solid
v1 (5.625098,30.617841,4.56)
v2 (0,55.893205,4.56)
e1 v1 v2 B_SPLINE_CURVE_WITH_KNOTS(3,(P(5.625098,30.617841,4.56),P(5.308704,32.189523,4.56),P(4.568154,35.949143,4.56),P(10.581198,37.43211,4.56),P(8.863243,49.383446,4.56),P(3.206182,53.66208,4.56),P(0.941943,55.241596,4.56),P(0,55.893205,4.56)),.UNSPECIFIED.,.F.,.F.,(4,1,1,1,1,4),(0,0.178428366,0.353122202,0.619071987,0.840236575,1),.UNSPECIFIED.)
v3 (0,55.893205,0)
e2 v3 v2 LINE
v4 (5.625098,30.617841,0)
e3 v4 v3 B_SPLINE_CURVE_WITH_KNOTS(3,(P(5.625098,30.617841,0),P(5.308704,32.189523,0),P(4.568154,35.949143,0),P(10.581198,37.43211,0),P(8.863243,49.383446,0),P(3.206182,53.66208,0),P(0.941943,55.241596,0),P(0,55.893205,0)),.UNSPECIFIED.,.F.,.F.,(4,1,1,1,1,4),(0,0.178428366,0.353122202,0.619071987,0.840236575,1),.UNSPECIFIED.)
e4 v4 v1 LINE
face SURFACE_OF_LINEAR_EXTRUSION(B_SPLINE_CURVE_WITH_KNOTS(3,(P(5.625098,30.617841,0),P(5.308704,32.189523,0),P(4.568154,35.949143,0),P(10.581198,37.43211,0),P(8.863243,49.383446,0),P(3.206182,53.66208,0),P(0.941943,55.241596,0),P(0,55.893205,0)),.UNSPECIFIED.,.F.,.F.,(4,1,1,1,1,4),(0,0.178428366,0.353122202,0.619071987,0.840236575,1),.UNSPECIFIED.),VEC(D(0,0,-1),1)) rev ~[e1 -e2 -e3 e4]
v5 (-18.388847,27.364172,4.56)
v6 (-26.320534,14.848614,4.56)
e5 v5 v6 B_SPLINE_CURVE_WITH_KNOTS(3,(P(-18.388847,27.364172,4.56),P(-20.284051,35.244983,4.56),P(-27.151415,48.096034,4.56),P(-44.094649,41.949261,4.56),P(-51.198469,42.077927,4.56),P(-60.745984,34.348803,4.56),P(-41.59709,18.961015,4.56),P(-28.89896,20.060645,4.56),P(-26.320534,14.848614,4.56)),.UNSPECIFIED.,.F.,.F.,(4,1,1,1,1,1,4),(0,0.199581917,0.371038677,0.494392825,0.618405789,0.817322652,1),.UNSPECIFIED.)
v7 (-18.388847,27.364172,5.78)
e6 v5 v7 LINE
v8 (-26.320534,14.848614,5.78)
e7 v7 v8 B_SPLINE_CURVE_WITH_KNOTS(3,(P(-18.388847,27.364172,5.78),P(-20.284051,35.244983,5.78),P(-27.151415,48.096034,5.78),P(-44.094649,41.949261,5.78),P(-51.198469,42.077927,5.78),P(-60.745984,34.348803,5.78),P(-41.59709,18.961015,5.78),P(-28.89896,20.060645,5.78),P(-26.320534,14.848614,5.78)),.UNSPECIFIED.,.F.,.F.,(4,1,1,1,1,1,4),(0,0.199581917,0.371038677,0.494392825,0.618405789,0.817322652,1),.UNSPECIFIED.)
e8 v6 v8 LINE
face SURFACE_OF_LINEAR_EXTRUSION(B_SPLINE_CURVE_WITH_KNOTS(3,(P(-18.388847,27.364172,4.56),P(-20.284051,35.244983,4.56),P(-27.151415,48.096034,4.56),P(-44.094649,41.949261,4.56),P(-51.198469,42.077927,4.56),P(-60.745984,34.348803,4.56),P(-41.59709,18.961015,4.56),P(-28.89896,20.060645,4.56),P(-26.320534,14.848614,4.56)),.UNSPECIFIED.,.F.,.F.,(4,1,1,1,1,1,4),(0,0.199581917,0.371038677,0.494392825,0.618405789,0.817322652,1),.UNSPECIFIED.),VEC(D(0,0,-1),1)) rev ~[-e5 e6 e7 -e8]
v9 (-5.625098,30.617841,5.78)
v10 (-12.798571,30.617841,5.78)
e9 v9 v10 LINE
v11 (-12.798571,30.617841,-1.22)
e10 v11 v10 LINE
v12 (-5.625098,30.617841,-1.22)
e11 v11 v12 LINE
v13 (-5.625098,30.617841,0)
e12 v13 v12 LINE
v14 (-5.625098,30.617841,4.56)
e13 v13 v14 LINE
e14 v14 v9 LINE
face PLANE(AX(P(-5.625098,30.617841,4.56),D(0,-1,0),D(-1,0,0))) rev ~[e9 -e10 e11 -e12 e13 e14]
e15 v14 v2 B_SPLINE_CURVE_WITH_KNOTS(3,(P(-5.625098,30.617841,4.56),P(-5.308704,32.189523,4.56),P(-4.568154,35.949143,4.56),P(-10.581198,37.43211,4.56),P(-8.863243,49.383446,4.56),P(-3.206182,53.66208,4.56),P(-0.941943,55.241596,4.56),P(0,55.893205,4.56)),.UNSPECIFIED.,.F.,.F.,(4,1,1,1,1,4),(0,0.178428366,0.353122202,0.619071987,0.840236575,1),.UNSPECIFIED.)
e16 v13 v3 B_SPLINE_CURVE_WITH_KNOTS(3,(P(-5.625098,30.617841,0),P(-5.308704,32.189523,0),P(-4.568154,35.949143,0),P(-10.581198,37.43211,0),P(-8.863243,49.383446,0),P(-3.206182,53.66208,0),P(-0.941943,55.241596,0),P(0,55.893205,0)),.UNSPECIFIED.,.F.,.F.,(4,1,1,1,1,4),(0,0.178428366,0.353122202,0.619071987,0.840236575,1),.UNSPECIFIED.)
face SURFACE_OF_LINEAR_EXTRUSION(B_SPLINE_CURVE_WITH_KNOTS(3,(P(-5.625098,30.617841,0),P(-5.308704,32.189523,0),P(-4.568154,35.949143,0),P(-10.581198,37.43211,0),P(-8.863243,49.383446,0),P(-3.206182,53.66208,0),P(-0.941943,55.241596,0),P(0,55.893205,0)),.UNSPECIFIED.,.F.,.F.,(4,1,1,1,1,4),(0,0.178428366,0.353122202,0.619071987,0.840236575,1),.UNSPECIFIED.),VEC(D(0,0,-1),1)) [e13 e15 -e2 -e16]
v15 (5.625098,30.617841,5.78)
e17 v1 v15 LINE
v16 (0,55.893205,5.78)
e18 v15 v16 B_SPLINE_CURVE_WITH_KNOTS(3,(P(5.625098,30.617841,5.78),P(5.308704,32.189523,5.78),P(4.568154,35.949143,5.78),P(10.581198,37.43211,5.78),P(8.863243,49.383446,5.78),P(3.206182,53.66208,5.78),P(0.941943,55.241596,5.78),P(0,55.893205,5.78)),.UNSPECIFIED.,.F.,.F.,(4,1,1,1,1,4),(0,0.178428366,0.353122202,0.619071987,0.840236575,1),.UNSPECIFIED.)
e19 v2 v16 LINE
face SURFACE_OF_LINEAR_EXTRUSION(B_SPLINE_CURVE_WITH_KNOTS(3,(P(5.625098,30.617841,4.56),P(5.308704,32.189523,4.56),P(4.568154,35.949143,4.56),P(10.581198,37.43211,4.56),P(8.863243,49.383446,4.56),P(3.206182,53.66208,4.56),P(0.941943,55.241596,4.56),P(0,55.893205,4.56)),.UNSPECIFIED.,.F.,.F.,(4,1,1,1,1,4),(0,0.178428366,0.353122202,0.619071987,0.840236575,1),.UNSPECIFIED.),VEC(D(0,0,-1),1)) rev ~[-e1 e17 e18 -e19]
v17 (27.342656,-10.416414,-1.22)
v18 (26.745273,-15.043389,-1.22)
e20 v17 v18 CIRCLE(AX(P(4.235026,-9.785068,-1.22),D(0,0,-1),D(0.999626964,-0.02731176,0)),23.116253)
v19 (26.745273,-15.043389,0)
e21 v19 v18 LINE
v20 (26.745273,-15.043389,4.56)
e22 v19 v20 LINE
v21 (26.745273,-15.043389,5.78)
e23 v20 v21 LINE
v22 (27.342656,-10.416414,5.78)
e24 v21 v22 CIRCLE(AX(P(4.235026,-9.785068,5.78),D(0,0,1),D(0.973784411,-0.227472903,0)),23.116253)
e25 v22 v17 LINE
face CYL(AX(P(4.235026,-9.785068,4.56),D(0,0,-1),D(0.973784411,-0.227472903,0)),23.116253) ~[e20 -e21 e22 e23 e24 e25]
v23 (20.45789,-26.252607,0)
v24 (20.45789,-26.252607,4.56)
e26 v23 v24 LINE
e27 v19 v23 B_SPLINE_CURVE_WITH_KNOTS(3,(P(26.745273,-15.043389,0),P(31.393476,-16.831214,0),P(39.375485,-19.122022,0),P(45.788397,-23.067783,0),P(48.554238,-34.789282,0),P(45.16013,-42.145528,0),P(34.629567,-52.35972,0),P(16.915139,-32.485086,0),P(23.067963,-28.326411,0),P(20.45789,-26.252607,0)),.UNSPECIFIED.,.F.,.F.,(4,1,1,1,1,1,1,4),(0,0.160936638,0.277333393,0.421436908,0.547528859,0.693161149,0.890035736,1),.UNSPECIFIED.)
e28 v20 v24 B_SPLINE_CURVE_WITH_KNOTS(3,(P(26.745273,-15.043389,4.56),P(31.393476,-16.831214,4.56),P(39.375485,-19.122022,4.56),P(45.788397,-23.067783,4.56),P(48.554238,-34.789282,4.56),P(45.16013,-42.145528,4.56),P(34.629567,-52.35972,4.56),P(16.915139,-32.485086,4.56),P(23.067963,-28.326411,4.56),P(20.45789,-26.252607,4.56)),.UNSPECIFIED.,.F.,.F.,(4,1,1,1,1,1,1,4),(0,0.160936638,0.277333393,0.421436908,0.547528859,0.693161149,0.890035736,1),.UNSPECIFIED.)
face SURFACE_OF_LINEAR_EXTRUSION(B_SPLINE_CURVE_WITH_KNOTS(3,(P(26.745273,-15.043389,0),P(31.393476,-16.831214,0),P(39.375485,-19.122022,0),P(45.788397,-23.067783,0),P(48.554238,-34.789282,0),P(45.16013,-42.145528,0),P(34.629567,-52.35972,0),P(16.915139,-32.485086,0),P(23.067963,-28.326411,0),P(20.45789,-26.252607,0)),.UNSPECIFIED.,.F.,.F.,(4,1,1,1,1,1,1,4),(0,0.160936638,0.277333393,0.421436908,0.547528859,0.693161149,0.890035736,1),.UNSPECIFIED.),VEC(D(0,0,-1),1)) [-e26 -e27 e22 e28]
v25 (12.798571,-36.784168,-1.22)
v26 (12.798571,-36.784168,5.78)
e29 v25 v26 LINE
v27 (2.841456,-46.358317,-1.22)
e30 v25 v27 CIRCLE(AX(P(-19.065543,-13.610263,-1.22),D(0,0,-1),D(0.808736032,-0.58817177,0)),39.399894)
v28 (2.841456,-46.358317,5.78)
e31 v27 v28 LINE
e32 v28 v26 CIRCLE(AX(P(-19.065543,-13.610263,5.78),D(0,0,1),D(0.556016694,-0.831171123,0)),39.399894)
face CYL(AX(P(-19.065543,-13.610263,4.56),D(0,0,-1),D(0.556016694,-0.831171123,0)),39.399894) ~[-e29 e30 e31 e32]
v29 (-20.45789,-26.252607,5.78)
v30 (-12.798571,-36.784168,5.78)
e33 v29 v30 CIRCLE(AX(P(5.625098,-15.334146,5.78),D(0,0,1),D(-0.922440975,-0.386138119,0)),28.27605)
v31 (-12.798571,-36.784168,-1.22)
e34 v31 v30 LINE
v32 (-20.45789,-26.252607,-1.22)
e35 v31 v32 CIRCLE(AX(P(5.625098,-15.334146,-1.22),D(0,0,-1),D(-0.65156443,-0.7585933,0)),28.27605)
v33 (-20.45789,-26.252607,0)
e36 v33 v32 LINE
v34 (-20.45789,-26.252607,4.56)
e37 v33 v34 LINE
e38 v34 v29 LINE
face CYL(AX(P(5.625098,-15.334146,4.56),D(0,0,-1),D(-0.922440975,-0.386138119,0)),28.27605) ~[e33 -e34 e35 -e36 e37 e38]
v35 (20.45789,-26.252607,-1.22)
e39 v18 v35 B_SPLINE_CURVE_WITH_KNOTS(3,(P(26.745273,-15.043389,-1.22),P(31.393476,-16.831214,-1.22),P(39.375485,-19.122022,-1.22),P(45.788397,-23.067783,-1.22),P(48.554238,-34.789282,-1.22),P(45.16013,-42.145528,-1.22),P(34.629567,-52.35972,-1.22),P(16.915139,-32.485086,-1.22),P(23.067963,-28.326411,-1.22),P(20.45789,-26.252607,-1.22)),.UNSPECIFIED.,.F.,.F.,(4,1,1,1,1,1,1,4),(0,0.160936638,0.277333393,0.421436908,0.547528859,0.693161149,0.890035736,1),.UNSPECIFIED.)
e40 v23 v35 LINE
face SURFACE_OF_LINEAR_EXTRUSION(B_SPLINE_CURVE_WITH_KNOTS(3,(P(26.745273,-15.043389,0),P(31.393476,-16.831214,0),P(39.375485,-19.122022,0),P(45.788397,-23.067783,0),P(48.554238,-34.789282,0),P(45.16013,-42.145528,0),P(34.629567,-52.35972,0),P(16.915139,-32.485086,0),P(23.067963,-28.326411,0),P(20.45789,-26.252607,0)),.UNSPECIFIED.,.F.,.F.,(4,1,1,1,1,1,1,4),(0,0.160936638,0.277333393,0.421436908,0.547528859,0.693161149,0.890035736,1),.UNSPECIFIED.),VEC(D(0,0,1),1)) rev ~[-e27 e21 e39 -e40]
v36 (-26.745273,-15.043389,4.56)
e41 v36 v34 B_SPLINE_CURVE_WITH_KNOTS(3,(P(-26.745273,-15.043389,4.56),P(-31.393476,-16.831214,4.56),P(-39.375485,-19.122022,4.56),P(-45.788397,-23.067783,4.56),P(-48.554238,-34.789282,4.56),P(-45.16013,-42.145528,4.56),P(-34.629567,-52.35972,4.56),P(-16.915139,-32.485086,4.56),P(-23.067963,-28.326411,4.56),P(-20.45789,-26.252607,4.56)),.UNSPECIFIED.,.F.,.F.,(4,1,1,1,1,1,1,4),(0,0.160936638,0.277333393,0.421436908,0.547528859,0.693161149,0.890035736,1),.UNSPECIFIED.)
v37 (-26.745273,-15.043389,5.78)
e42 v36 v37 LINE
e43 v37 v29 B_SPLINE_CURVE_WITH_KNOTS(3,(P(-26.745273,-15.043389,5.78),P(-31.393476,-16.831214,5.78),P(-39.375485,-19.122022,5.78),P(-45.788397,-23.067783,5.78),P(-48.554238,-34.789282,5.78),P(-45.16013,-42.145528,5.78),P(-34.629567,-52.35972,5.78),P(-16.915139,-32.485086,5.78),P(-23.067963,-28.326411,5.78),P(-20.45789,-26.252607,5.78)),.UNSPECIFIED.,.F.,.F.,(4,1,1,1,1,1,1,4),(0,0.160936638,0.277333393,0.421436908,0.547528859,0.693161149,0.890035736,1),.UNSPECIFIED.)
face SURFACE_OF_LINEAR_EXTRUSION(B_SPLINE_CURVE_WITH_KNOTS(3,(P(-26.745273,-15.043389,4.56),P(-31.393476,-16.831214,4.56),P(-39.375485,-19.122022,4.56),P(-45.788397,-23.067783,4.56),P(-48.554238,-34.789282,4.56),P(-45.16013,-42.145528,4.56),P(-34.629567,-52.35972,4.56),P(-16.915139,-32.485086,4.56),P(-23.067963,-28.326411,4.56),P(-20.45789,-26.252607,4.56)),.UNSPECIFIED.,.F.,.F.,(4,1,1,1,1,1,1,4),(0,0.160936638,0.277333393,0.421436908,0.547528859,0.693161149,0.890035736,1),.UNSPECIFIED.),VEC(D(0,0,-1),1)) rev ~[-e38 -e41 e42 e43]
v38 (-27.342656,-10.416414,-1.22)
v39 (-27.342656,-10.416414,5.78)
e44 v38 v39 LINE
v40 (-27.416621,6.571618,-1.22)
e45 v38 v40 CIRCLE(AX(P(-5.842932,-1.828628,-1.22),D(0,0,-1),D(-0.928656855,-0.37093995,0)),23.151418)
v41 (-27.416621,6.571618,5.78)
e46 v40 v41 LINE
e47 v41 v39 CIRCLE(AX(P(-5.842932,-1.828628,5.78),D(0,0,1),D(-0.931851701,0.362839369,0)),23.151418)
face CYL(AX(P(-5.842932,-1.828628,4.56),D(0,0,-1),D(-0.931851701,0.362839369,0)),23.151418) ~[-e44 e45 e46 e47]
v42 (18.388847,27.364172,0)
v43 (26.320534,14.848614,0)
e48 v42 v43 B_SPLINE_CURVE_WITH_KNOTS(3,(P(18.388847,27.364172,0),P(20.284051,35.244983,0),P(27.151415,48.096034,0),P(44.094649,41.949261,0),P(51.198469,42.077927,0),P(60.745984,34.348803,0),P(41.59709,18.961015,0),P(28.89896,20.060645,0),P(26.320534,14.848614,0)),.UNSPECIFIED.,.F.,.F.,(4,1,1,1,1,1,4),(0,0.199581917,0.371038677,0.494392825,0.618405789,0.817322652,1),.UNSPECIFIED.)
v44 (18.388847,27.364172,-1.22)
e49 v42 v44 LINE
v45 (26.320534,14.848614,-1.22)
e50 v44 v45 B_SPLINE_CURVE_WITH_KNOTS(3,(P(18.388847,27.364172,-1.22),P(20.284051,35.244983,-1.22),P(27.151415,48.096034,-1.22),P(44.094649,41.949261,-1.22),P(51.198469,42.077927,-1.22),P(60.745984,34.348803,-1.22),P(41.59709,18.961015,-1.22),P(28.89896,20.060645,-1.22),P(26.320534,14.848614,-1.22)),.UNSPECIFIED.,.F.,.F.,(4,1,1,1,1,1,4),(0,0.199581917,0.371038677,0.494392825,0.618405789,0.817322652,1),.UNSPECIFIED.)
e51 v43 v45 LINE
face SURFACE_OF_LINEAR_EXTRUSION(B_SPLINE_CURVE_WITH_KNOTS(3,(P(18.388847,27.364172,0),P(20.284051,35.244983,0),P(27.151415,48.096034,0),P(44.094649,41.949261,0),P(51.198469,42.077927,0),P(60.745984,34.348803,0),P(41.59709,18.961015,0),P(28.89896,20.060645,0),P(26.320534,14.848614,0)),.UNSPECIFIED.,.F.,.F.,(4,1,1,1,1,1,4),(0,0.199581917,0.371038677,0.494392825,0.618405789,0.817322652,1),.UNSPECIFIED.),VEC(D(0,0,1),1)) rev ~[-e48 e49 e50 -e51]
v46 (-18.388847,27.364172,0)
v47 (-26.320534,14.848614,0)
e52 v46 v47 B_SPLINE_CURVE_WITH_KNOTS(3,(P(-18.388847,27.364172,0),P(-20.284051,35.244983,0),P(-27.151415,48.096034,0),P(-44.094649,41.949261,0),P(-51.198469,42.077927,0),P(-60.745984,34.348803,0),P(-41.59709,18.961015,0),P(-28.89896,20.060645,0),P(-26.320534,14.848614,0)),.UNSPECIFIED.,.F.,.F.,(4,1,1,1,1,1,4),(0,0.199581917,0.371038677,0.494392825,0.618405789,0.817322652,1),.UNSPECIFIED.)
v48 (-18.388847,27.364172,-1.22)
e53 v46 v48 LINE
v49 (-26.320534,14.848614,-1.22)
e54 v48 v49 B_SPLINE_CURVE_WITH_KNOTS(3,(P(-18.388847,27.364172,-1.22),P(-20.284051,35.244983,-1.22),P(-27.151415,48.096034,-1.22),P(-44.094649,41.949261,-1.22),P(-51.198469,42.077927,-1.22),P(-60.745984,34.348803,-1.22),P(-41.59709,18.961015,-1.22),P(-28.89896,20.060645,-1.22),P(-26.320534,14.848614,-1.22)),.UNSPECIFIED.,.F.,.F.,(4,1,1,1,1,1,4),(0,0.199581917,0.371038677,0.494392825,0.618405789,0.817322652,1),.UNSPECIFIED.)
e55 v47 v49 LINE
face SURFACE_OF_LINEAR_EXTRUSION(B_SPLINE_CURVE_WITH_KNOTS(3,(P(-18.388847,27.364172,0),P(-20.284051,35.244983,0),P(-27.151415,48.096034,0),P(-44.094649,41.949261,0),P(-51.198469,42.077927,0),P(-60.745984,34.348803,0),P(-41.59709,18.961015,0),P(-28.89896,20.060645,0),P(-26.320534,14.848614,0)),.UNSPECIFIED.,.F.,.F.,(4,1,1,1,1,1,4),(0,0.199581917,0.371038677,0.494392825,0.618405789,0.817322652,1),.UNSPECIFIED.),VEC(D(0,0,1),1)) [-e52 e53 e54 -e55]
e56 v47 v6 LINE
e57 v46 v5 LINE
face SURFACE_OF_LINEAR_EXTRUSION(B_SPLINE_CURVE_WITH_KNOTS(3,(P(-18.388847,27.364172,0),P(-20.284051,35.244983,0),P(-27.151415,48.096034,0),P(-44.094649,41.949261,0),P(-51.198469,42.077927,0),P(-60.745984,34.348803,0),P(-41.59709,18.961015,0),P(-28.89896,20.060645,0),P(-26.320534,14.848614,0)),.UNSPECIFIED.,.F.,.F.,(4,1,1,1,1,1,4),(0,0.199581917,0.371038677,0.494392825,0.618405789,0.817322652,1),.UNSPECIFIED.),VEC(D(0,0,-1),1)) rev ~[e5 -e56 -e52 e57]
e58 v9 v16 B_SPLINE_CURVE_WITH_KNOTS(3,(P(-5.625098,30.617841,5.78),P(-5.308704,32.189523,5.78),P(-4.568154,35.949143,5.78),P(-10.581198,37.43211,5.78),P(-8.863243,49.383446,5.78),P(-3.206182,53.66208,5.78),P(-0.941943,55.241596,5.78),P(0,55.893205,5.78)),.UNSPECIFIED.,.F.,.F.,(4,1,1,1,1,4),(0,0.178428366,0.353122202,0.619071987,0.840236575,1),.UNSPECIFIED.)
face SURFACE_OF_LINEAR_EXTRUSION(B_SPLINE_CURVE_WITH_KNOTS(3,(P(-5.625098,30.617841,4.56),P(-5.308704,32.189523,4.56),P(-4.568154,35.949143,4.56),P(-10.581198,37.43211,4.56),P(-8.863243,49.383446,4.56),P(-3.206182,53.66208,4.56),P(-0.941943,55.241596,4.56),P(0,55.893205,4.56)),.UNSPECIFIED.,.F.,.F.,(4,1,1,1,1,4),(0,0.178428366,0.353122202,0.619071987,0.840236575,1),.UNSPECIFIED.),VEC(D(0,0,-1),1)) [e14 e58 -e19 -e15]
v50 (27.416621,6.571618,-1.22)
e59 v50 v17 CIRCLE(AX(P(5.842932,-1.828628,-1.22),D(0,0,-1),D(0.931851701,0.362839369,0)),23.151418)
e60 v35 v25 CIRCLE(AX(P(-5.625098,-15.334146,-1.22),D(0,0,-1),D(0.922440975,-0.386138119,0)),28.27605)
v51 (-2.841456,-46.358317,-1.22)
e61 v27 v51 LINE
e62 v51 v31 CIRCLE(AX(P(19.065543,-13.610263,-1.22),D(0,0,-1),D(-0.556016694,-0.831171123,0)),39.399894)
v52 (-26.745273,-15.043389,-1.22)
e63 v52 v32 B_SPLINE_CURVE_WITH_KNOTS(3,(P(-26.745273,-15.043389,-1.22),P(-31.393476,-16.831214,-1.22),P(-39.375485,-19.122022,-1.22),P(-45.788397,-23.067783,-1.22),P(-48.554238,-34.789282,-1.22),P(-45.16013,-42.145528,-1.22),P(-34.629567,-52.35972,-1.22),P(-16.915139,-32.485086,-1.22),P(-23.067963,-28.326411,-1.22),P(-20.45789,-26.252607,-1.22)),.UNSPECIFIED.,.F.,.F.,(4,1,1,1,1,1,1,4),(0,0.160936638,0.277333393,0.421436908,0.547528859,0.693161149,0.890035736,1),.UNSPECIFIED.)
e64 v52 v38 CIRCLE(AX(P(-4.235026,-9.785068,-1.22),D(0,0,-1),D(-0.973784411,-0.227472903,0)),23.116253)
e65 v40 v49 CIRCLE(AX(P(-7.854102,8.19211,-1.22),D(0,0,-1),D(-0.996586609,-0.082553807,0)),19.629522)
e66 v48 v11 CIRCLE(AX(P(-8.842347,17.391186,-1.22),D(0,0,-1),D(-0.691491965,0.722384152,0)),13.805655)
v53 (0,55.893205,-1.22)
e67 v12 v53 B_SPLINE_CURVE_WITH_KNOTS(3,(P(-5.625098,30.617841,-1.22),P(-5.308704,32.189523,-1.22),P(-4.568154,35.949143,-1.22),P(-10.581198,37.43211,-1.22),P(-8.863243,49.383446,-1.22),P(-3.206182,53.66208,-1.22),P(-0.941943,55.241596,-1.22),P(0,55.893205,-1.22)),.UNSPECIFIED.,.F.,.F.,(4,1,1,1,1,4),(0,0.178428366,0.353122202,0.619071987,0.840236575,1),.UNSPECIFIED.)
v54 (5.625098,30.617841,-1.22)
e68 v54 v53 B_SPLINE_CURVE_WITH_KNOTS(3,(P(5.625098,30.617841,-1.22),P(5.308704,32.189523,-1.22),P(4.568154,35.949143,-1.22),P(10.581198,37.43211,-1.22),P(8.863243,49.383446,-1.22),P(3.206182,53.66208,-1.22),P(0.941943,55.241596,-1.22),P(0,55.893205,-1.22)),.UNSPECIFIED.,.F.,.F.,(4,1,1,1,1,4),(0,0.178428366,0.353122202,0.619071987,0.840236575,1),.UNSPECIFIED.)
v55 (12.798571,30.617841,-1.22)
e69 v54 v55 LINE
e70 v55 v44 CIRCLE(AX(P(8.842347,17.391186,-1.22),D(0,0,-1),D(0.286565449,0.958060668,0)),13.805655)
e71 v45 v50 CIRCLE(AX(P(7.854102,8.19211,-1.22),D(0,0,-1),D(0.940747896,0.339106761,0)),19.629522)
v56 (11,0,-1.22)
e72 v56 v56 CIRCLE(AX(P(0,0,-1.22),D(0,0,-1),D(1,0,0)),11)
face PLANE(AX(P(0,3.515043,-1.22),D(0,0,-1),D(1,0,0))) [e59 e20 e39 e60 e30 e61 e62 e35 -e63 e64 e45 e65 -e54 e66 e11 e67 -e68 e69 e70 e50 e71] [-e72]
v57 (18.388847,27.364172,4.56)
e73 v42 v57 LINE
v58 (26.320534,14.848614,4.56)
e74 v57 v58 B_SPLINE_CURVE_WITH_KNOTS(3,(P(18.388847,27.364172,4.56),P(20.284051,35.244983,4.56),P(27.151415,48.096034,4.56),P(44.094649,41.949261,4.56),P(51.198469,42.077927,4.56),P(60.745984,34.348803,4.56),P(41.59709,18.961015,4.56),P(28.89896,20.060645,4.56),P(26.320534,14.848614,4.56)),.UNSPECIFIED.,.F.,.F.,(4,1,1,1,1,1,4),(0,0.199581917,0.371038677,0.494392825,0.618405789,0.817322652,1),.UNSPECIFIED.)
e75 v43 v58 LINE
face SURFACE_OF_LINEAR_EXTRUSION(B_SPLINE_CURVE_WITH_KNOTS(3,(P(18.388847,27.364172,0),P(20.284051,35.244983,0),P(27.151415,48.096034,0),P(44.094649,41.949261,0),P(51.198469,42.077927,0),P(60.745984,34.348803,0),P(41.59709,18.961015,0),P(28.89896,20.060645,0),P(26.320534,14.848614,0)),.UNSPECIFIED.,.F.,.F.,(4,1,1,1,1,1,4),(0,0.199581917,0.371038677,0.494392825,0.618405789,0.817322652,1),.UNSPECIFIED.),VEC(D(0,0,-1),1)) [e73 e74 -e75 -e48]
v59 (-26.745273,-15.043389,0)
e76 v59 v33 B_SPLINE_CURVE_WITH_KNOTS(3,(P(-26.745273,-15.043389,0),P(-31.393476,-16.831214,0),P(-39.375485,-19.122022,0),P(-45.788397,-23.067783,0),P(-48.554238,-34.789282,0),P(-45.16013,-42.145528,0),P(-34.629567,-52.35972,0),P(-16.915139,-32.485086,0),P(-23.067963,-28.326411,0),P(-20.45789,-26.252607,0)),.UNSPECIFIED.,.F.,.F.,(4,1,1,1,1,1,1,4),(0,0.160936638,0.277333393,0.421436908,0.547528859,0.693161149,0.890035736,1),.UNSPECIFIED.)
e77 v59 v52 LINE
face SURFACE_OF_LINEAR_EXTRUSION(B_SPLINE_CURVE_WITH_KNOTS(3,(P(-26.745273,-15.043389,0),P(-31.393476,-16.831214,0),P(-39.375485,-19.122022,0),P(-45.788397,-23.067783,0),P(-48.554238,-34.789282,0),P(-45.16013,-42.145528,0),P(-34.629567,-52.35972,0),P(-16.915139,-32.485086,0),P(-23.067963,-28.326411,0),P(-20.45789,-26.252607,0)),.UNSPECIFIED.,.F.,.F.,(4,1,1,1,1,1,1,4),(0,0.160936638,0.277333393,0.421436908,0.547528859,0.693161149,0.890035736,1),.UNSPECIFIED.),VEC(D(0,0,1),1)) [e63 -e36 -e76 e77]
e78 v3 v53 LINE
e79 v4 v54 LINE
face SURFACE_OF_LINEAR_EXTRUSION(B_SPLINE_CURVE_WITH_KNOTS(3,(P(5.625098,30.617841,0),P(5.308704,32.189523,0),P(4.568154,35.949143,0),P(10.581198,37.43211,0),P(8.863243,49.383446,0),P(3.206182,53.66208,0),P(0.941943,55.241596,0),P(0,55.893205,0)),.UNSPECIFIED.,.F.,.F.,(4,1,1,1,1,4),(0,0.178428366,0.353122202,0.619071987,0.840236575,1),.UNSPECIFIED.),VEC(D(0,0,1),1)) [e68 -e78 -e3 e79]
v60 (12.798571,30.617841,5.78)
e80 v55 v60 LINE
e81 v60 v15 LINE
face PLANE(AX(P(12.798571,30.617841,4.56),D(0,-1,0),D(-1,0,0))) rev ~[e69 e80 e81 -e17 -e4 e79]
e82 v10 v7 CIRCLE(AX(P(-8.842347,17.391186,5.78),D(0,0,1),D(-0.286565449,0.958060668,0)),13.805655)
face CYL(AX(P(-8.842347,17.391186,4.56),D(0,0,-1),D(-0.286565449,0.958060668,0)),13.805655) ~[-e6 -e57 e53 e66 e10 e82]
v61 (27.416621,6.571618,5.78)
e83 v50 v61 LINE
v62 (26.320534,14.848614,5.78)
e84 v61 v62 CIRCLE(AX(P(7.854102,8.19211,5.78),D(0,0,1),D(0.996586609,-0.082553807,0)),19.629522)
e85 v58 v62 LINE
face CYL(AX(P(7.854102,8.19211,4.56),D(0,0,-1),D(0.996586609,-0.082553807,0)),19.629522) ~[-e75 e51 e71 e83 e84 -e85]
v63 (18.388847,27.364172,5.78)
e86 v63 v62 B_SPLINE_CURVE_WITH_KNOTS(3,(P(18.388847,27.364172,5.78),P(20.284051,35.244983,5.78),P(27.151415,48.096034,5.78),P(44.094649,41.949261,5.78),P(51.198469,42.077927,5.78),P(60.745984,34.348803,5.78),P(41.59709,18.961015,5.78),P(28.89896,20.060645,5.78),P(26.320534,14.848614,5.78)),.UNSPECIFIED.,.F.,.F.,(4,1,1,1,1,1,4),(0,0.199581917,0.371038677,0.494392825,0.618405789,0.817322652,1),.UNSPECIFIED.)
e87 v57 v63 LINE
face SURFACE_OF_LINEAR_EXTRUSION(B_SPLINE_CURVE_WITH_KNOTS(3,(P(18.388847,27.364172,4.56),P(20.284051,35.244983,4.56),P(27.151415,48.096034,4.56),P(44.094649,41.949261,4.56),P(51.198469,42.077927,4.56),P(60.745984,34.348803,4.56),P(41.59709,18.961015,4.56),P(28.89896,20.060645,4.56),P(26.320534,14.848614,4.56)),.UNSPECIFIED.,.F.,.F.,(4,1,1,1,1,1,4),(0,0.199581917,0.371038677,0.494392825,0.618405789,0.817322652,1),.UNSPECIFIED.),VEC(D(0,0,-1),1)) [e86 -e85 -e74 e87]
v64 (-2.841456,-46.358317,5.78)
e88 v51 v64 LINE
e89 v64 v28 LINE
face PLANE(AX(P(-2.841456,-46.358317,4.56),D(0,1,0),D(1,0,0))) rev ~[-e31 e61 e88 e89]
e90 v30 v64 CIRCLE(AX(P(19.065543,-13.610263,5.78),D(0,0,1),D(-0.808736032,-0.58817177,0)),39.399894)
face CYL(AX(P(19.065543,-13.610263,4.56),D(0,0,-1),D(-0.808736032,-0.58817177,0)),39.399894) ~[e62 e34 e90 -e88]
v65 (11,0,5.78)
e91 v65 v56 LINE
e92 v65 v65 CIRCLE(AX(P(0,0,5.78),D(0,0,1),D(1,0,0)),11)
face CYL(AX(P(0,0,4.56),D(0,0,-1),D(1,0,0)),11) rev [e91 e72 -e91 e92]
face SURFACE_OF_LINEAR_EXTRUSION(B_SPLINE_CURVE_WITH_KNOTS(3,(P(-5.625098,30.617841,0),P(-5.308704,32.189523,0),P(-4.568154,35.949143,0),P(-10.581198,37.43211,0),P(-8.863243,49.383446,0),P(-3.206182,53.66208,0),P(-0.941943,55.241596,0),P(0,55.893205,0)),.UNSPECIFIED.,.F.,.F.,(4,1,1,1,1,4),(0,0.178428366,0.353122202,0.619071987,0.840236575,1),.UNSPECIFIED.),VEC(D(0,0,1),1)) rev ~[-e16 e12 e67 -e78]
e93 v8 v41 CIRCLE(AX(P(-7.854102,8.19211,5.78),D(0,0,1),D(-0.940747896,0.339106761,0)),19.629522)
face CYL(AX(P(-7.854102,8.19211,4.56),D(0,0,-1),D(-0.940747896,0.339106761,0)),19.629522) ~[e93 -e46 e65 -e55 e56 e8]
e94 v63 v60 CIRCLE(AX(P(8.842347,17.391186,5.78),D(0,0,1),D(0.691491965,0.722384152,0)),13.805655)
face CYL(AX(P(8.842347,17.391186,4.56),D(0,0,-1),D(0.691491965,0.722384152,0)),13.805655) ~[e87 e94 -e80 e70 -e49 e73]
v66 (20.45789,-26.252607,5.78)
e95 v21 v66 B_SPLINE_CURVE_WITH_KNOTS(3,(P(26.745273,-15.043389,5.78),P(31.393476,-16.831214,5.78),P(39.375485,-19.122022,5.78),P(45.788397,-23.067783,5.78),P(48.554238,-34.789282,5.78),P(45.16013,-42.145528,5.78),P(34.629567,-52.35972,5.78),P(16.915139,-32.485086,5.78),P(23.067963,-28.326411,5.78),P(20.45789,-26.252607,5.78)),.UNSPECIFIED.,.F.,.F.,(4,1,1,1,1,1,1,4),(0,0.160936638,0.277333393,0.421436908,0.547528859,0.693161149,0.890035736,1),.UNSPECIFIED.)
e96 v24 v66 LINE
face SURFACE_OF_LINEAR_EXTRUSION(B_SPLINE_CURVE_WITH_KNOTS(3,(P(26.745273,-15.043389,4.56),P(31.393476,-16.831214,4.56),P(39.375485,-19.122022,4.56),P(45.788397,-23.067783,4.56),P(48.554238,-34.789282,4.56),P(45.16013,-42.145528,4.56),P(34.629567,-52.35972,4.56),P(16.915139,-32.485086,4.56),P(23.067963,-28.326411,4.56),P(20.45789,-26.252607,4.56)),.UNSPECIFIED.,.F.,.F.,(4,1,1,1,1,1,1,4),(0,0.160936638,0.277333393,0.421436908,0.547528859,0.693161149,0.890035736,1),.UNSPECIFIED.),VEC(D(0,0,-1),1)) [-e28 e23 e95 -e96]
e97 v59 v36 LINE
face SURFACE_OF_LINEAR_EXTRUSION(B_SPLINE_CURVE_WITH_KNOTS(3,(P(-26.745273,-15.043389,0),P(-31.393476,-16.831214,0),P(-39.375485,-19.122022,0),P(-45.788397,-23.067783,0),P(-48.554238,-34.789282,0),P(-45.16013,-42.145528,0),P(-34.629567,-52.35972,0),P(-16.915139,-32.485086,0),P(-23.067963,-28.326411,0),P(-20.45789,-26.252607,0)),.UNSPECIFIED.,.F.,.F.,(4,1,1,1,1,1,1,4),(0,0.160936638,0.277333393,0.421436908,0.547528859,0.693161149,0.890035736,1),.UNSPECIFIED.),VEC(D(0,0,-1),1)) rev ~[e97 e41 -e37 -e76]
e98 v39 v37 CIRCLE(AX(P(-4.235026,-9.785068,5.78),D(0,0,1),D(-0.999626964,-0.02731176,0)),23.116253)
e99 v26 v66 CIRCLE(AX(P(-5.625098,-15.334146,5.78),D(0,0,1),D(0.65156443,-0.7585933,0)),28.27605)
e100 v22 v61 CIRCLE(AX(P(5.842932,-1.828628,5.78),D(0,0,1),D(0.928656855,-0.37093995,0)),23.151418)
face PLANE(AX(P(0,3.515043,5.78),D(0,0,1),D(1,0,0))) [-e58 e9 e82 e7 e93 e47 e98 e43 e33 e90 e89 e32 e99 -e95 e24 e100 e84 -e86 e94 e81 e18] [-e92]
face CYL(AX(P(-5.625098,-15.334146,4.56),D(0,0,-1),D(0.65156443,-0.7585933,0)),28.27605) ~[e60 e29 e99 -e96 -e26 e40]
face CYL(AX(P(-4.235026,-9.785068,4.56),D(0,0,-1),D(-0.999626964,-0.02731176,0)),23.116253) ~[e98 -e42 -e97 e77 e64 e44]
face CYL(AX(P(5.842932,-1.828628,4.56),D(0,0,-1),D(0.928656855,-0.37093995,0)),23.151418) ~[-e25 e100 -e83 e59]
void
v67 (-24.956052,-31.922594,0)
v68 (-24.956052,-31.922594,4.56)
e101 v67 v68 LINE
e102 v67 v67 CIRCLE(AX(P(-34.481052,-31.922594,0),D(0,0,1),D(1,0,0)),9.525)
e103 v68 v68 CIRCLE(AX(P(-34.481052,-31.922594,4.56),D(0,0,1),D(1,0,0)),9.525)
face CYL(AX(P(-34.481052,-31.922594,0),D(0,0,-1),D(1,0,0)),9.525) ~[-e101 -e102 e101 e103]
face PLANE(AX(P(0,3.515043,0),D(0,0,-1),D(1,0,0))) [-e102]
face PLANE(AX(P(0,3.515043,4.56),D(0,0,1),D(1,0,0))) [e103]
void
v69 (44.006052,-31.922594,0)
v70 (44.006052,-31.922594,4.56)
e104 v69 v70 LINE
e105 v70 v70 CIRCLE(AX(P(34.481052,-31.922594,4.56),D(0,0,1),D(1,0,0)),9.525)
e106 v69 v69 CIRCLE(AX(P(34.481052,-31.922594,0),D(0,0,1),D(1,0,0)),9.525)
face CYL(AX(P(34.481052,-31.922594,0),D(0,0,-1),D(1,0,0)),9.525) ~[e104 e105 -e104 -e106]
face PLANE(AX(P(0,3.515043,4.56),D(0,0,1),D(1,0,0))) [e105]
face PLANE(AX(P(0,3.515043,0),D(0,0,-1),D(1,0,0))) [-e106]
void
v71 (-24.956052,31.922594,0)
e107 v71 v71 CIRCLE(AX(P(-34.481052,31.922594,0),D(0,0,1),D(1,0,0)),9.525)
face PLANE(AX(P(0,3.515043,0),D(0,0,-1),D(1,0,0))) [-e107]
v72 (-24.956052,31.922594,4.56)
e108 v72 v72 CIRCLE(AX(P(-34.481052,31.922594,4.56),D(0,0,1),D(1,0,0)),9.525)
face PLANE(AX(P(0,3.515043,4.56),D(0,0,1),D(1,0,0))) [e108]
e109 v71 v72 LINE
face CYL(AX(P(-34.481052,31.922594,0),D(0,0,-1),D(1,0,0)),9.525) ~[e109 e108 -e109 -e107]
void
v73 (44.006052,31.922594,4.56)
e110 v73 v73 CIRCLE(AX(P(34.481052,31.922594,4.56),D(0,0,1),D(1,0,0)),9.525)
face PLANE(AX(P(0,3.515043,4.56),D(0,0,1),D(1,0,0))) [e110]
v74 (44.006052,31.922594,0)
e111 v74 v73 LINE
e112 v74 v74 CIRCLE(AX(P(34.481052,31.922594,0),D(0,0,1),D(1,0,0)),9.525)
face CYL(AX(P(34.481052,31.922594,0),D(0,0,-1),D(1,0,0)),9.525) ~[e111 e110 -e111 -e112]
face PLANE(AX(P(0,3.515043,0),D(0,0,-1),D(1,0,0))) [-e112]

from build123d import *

# Parameters (mm, degrees)
F0_R     = 11
F0_R_2   = 9.525
F1_DEPTH = 4.56
F2_R     = 9.525
F2_R_2   = 11
F3_DEPTH = 1.22
F4_R     = 9.525
F4_R_2   = 11
F5_DEPTH = 1.22


with BuildPart() as f1:
    # F0 (on Top) → F1 (new body)
    with BuildSketch(Plane.XY):
        with BuildLine():
            Line((5.625097611, 30.6178405881), (0, 30.6178405881))
            Line((0, 30.6178405881), (-5.625097611, 30.6178405881))
            Line((-5.625097611, 30.6178405881), (-12.7985710278, 30.6178405881))
            ThreePointArc((-12.7985710278, 30.6178405881), (-15.7869475666, 29.3230184651), (-18.3888467007, 27.364171977))
            ThreePointArc((-18.3888467007, 27.364171977), (-20.4594688448, 24.8503138656), (-21.8835807745, 21.9213441014))
            ThreePointArc((-21.8835807745, 21.9213441014), (-24.482449048, 18.6236111214), (-26.320533588, 14.8486138585))
            ThreePointArc((-26.320533588, 14.8486138585), (-27.3137379545, 10.7690668007), (-27.4166208475, 6.5716182636))
            ThreePointArc((-27.4166208475, 6.5716182636), (-28.9941311969, -1.9294271862), (-27.3426556245, -10.4164137584))
            ThreePointArc((-27.3426556245, -10.4164137584), (-27.160991282, -12.7450107701), (-26.7452726242, -15.0433893234))
            ThreePointArc((-26.7452726242, -15.0433893234), (-24.3962536961, -21.0937392774), (-20.4578898847, -26.2526068836))
            ThreePointArc((-20.4578898847, -26.2526068836), (-17.2427631702, -31.9653205751), (-12.7985710278, -36.7841683328))
            ThreePointArc((-12.7985710278, -36.7841683328), (-8.2428664491, -42.0110098773), (-2.8414558619, -46.3583171368))
            Line((-2.8414558619, -46.3583171368), (0, -46.3583171368))
            Line((0, -46.3583171368), (2.8414558619, -46.3583171368))
            ThreePointArc((2.8414558619, -46.3583171368), (8.2428664491, -42.0110098773), (12.7985710278, -36.7841683328))
            ThreePointArc((12.7985710278, -36.7841683328), (17.2427631702, -31.9653205751), (20.4578898847, -26.2526068836))
            ThreePointArc((20.4578898847, -26.2526068836), (24.3962536961, -21.0937392774), (26.7452726242, -15.0433893234))
            ThreePointArc((26.7452726242, -15.0433893234), (27.160991282, -12.7450107701), (27.3426556245, -10.4164137584))
            ThreePointArc((27.3426556245, -10.4164137584), (28.9941311969, -1.9294271862), (27.4166208475, 6.5716182636))
            ThreePointArc((27.4166208475, 6.5716182636), (27.3137379545, 10.7690668007), (26.320533588, 14.8486138585))
            ThreePointArc((26.320533588, 14.8486138585), (24.482449048, 18.6236111214), (21.8835807745, 21.9213441014))
            ThreePointArc((21.8835807745, 21.9213441014), (20.4594688448, 24.8503138656), (18.3888467007, 27.364171977))
            ThreePointArc((18.3888467007, 27.364171977), (15.7869475666, 29.3230184651), (12.7985710278, 30.6178405881))
            Line((12.7985710278, 30.6178405881), (5.625097611, 30.6178405881))
        make_face()
        Circle(F0_R, mode=Mode.SUBTRACT)
        with BuildLine():
            Line((-5.625097611, 30.6178405881), (0, 30.6178405881))
            Line((0, 30.6178405881), (5.625097611, 30.6178405881))
            add(Edge.make_bspline(
                [(5.625097611, 30.6178405881), (5.3087040961, 32.1895229994), (4.568154115, 35.9491431064), (10.5811975265, 37.4321097713), (8.8632431136, 49.383446037), (3.2061824976, 53.6620796768), (0.9419427303, 55.2415959276), (0, 55.8932051063)],
                knots=[0, 0, 0, 0, 0.1784283658, 0.3531222021, 0.6190719873, 0.8402365752, 1, 1, 1, 1], degree=3))
            add(Edge.make_bspline(
                [(-5.625097611, 30.6178405881), (-5.3087040961, 32.1895229994), (-4.568154115, 35.9491431064), (-10.5811975265, 37.4321097713), (-8.8632431136, 49.383446037), (-3.2061824976, 53.6620796768), (-0.9419427303, 55.2415959276), (0, 55.8932051063)],
                knots=[0, 0, 0, 0, 0.1784283658, 0.3531222021, 0.6190719873, 0.8402365752, 1, 1, 1, 1], degree=3))
        make_face()
        with BuildLine():
            ThreePointArc((-21.8835807745, 21.9213441014), (-20.4594688448, 24.8503138656), (-18.3888467007, 27.364171977))
            add(Edge.make_bspline(
                [(-18.3888467007, 27.364171977), (-20.2840508895, 35.2449831328), (-27.1514149225, 48.0960335812), (-44.0946491651, 41.9492612732), (-51.1984685962, 42.077927417), (-60.7459841372, 34.3488029627), (-41.5970901495, 18.9610148145), (-28.8989599794, 20.0606454164), (-26.320533588, 14.8486138585)],
                knots=[0, 0, 0, 0, 0.1995819174, 0.371038677, 0.4943928252, 0.6184057886, 0.8173226516, 1, 1, 1, 1], degree=3))
            ThreePointArc((-26.320533588, 14.8486138585), (-24.482449048, 18.6236111214), (-21.8835807745, 21.9213441014))
        make_face()
        with Locations((-34.4810523093, 31.9225937128)):
            Circle(F0_R_2, mode=Mode.SUBTRACT)
        with BuildLine():
            add(Edge.make_bspline(
                [(18.3888467007, 27.364171977), (20.2840508895, 35.2449831328), (27.1514149225, 48.0960335812), (44.0946491651, 41.9492612732), (51.1984685962, 42.077927417), (60.7459841372, 34.3488029627), (41.5970901495, 18.9610148145), (28.8989599794, 20.0606454164), (26.320533588, 14.8486138585)],
                knots=[0, 0, 0, 0, 0.1995819174, 0.371038677, 0.4943928252, 0.6184057886, 0.8173226516, 1, 1, 1, 1], degree=3))
            ThreePointArc((18.3888467007, 27.364171977), (20.4594688448, 24.8503138656), (21.8835807745, 21.9213441014))
            ThreePointArc((21.8835807745, 21.9213441014), (24.482449048, 18.6236111214), (26.320533588, 14.8486138585))
        make_face()
        with Locations((34.4810523093, 31.9225937128)):
            Circle(F0_R_2, mode=Mode.SUBTRACT)
        with BuildLine():
            ThreePointArc((-20.4578898847, -26.2526068836), (-24.3962536961, -21.0937392774), (-26.7452726242, -15.0433893234))
            add(Edge.make_bspline(
                [(-26.7452726242, -15.0433893234), (-31.393476313, -16.8312141012), (-39.3754850186, -19.1220217061), (-45.7883974033, -23.0677833544), (-48.5542379231, -34.7892824207), (-45.1601303547, -42.145527965), (-34.6295665467, -52.3597202212), (-16.9151388877, -32.4850856335), (-23.0679627748, -28.326411455), (-20.4578898847, -26.2526068836)],
                knots=[0, 0, 0, 0, 0.1609366377, 0.2773333927, 0.4214369084, 0.5475288587, 0.6931611492, 0.8900357357, 1, 1, 1, 1], degree=3))
        make_face()
        with Locations((-34.4810523093, -31.9225937128)):
            Circle(F0_R_2, mode=Mode.SUBTRACT)
        with BuildLine():
            add(Edge.make_bspline(
                [(26.7452726242, -15.0433893234), (31.393476313, -16.8312141012), (39.3754850186, -19.1220217061), (45.7883974033, -23.0677833544), (48.5542379231, -34.7892824207), (45.1601303547, -42.145527965), (34.6295665467, -52.3597202212), (16.9151388877, -32.4850856335), (23.0679627748, -28.326411455), (20.4578898847, -26.2526068836)],
                knots=[0, 0, 0, 0, 0.1609366377, 0.2773333927, 0.4214369084, 0.5475288587, 0.6931611492, 0.8900357357, 1, 1, 1, 1], degree=3))
            ThreePointArc((26.7452726242, -15.0433893234), (24.3962536961, -21.0937392774), (20.4578898847, -26.2526068836))
        make_face()
        with Locations((34.4810523093, -31.9225937128)):
            Circle(F0_R_2, mode=Mode.SUBTRACT)
    extrude(amount=F1_DEPTH)

    # F2 (on face) → F3 (join)
    with BuildSketch(Plane(origin=(0, 0, 0), x_dir=(1, 0, 0), z_dir=(0, 0, -1))):
        with BuildLine():
            add(Edge.make_bspline(
                [(18.3888467007, -27.364171977), (20.2840508895, -35.2449831328), (27.1514149225, -48.0960335812), (44.0946491651, -41.9492612732), (51.1984685962, -42.077927417), (60.7459841372, -34.3488029627), (41.5970901495, -18.9610148145), (28.8989599794, -20.0606454164), (26.320533588, -14.8486138585)],
                knots=[0, 0, 0, 0, 0.1995819174, 0.371038677, 0.4943928252, 0.6184057886, 0.8173226516, 1, 1, 1, 1], degree=3))
            ThreePointArc((26.320533588, -14.8486138585), (27.3137379545, -10.7690668007), (27.4166208475, -6.5716182636))
            ThreePointArc((27.4166208475, -6.5716182636), (28.9941311969, 1.9294271862), (27.3426556245, 10.4164137584))
            ThreePointArc((27.3426556245, 10.4164137584), (27.160991282, 12.7450107701), (26.7452726242, 15.0433893234))
            add(Edge.make_bspline(
                [(26.7452726242, 15.0433893234), (31.393476313, 16.8312141012), (39.3754850186, 19.1220217061), (45.7883974033, 23.0677833544), (48.5542379231, 34.7892824207), (45.1601303547, 42.145527965), (34.6295665467, 52.3597202212), (16.9151388877, 32.4850856335), (23.0679627748, 28.326411455), (20.4578898847, 26.2526068836)],
                knots=[0, 0, 0, 0, 0.1609366377, 0.2773333927, 0.4214369084, 0.5475288587, 0.6931611492, 0.8900357357, 1, 1, 1, 1], degree=3))
            ThreePointArc((20.4578898847, 26.2526068836), (17.2427631702, 31.9653205751), (12.7985710278, 36.7841683328))
            ThreePointArc((12.7985710278, 36.7841683328), (8.2428664491, 42.0110098773), (2.8414558619, 46.3583171368))
            Line((2.8414558619, 46.3583171368), (-2.8414558619, 46.3583171368))
            ThreePointArc((-2.8414558619, 46.3583171368), (-8.2428664491, 42.0110098773), (-12.7985710278, 36.7841683328))
            ThreePointArc((-12.7985710278, 36.7841683328), (-17.2427631702, 31.9653205751), (-20.4578898847, 26.2526068836))
            add(Edge.make_bspline(
                [(-26.7452726242, 15.0433893234), (-31.393476313, 16.8312141012), (-39.3754850186, 19.1220217061), (-45.7883974033, 23.0677833544), (-48.5542379231, 34.7892824207), (-45.1601303547, 42.145527965), (-34.6295665467, 52.3597202212), (-16.9151388877, 32.4850856335), (-23.0679627748, 28.326411455), (-20.4578898847, 26.2526068836)],
                knots=[0, 0, 0, 0, 0.1609366377, 0.2773333927, 0.4214369084, 0.5475288587, 0.6931611492, 0.8900357357, 1, 1, 1, 1], degree=3))
            ThreePointArc((-26.7452726242, 15.0433893234), (-27.160991282, 12.7450107701), (-27.3426556245, 10.4164137584))
            ThreePointArc((-27.3426556245, 10.4164137584), (-28.9941311969, 1.9294271862), (-27.4166208475, -6.5716182636))
            ThreePointArc((-27.4166208475, -6.5716182636), (-27.3137379545, -10.7690668007), (-26.320533588, -14.8486138585))
            add(Edge.make_bspline(
                [(-18.3888467007, -27.364171977), (-20.2840508895, -35.2449831328), (-27.1514149225, -48.0960335812), (-44.0946491651, -41.9492612732), (-51.1984685962, -42.077927417), (-60.7459841372, -34.3488029627), (-41.5970901495, -18.9610148145), (-28.8989599794, -20.0606454164), (-26.320533588, -14.8486138585)],
                knots=[0, 0, 0, 0, 0.1995819174, 0.371038677, 0.4943928252, 0.6184057886, 0.8173226516, 1, 1, 1, 1], degree=3))
            ThreePointArc((-18.3888467007, -27.364171977), (-15.7869475666, -29.3230184651), (-12.7985710278, -30.6178405881))
            Line((-12.7985710278, -30.6178405881), (-5.625097611, -30.6178405881))
            add(Edge.make_bspline(
                [(-5.625097611, -30.6178405881), (-5.3087040961, -32.1895229994), (-4.568154115, -35.9491431064), (-10.5811975265, -37.4321097713), (-8.8632431136, -49.383446037), (-3.2061824976, -53.6620796768), (-0.9419427303, -55.2415959276), (0, -55.8932051063)],
                knots=[0, 0, 0, 0, 0.1784283658, 0.3531222021, 0.6190719873, 0.8402365752, 1, 1, 1, 1], degree=3))
            add(Edge.make_bspline(
                [(5.625097611, -30.6178405881), (5.3087040961, -32.1895229994), (4.568154115, -35.9491431064), (10.5811975265, -37.4321097713), (8.8632431136, -49.383446037), (3.2061824976, -53.6620796768), (0.9419427303, -55.2415959276), (0, -55.8932051063)],
                knots=[0, 0, 0, 0, 0.1784283658, 0.3531222021, 0.6190719873, 0.8402365752, 1, 1, 1, 1], degree=3))
            Line((5.625097611, -30.6178405881), (12.7985710278, -30.6178405881))
            ThreePointArc((12.7985710278, -30.6178405881), (15.7869475666, -29.3230184651), (18.3888467007, -27.364171977))
        make_face()
        with Locations((-34.4810523093, -31.9225937128)):
            Circle(F2_R, mode=Mode.SUBTRACT)
        with Locations((34.4810523093, -31.9225937128)):
            Circle(F2_R, mode=Mode.SUBTRACT)
        Circle(F2_R_2, mode=Mode.SUBTRACT)
        with Locations((-34.4810523093, 31.9225937128)):
            Circle(F2_R, mode=Mode.SUBTRACT)
        with Locations((34.4810523093, 31.9225937128)):
            Circle(F2_R, mode=Mode.SUBTRACT)
        with Locations((-34.4810523093, 31.9225937128)):
            Circle(F2_R)
        with Locations((34.4810523093, 31.9225937128)):
            Circle(F2_R)
        with Locations((-34.4810523093, -31.9225937128)):
            Circle(F2_R)
        with Locations((34.4810523093, -31.9225937128)):
            Circle(F2_R)
    extrude(amount=F3_DEPTH)

    # F4 (on face) → F5 (join)
    with BuildSketch(Plane.XY.offset(4.56)):
        with BuildLine():
            ThreePointArc((27.3426556245, -10.4164137584), (28.9941311969, -1.9294271862), (27.4166208475, 6.5716182636))
            ThreePointArc((27.4166208475, 6.5716182636), (27.3137379545, 10.7690668007), (26.320533588, 14.8486138585))
            add(Edge.make_bspline(
                [(18.3888467007, 27.364171977), (20.2840508895, 35.2449831328), (27.1514149225, 48.0960335812), (44.0946491651, 41.9492612732), (51.1984685962, 42.077927417), (60.7459841372, 34.3488029627), (41.5970901495, 18.9610148145), (28.8989599794, 20.0606454164), (26.320533588, 14.8486138585)],
                knots=[0, 0, 0, 0, 0.1995819174, 0.371038677, 0.4943928252, 0.6184057886, 0.8173226516, 1, 1, 1, 1], degree=3))
            ThreePointArc((18.3888467007, 27.364171977), (15.7869475666, 29.3230184651), (12.7985710278, 30.6178405881))
            Line((12.7985710278, 30.6178405881), (5.625097611, 30.6178405881))
            add(Edge.make_bspline(
                [(5.625097611, 30.6178405881), (5.3087040961, 32.1895229994), (4.568154115, 35.9491431064), (10.5811975265, 37.4321097713), (8.8632431136, 49.383446037), (3.2061824976, 53.6620796768), (0.9419427303, 55.2415959276), (0, 55.8932051063)],
                knots=[0, 0, 0, 0, 0.1784283658, 0.3531222021, 0.6190719873, 0.8402365752, 1, 1, 1, 1], degree=3))
            add(Edge.make_bspline(
                [(-5.625097611, 30.6178405881), (-5.3087040961, 32.1895229994), (-4.568154115, 35.9491431064), (-10.5811975265, 37.4321097713), (-8.8632431136, 49.383446037), (-3.2061824976, 53.6620796768), (-0.9419427303, 55.2415959276), (0, 55.8932051063)],
                knots=[0, 0, 0, 0, 0.1784283658, 0.3531222021, 0.6190719873, 0.8402365752, 1, 1, 1, 1], degree=3))
            Line((-5.625097611, 30.6178405881), (-12.7985710278, 30.6178405881))
            ThreePointArc((-12.7985710278, 30.6178405881), (-15.7869475666, 29.3230184651), (-18.3888467007, 27.364171977))
            add(Edge.make_bspline(
                [(-18.3888467007, 27.364171977), (-20.2840508895, 35.2449831328), (-27.1514149225, 48.0960335812), (-44.0946491651, 41.9492612732), (-51.1984685962, 42.077927417), (-60.7459841372, 34.3488029627), (-41.5970901495, 18.9610148145), (-28.8989599794, 20.0606454164), (-26.320533588, 14.8486138585)],
                knots=[0, 0, 0, 0, 0.1995819174, 0.371038677, 0.4943928252, 0.6184057886, 0.8173226516, 1, 1, 1, 1], degree=3))
            ThreePointArc((-26.320533588, 14.8486138585), (-27.3137379545, 10.7690668007), (-27.4166208475, 6.5716182636))
            ThreePointArc((-27.4166208475, 6.5716182636), (-28.9941311969, -1.9294271862), (-27.3426556245, -10.4164137584))
            ThreePointArc((-27.3426556245, -10.4164137584), (-27.160991282, -12.7450107701), (-26.7452726242, -15.0433893234))
            add(Edge.make_bspline(
                [(-26.7452726242, -15.0433893234), (-31.393476313, -16.8312141012), (-39.3754850186, -19.1220217061), (-45.7883974033, -23.0677833544), (-48.5542379231, -34.7892824207), (-45.1601303547, -42.145527965), (-34.6295665467, -52.3597202212), (-16.9151388877, -32.4850856335), (-23.0679627748, -28.326411455), (-20.4578898847, -26.2526068836)],
                knots=[0, 0, 0, 0, 0.1609366377, 0.2773333927, 0.4214369084, 0.5475288587, 0.6931611492, 0.8900357357, 1, 1, 1, 1], degree=3))
            ThreePointArc((-20.4578898847, -26.2526068836), (-17.2427631702, -31.9653205751), (-12.7985710278, -36.7841683328))
            ThreePointArc((-12.7985710278, -36.7841683328), (-8.2428664491, -42.0110098773), (-2.8414558619, -46.3583171368))
            Line((-2.8414558619, -46.3583171368), (2.8414558619, -46.3583171368))
            ThreePointArc((2.8414558619, -46.3583171368), (8.2428664491, -42.0110098773), (12.7985710278, -36.7841683328))
            ThreePointArc((12.7985710278, -36.7841683328), (17.2427631702, -31.9653205751), (20.4578898847, -26.2526068836))
            add(Edge.make_bspline(
                [(26.7452726242, -15.0433893234), (31.393476313, -16.8312141012), (39.3754850186, -19.1220217061), (45.7883974033, -23.0677833544), (48.5542379231, -34.7892824207), (45.1601303547, -42.145527965), (34.6295665467, -52.3597202212), (16.9151388877, -32.4850856335), (23.0679627748, -28.326411455), (20.4578898847, -26.2526068836)],
                knots=[0, 0, 0, 0, 0.1609366377, 0.2773333927, 0.4214369084, 0.5475288587, 0.6931611492, 0.8900357357, 1, 1, 1, 1], degree=3))
            ThreePointArc((26.7452726242, -15.0433893234), (27.160991282, -12.7450107701), (27.3426556245, -10.4164137584))
        make_face()
        with Locations((-34.4810523093, -31.9225937128)):
            Circle(F4_R, mode=Mode.SUBTRACT)
        Circle(F4_R_2, mode=Mode.SUBTRACT)
        with Locations((34.4810523093, -31.9225937128)):
            Circle(F4_R, mode=Mode.SUBTRACT)
        with Locations((-34.4810523093, 31.9225937128)):
            Circle(F4_R, mode=Mode.SUBTRACT)
        with Locations((34.4810523093, 31.9225937128)):
            Circle(F4_R, mode=Mode.SUBTRACT)
        with Locations((-34.4810523093, 31.9225937128)):
            Circle(F4_R)
        with Locations((34.4810523093, 31.9225937128)):
            Circle(F4_R)
        with Locations((-34.4810523093, -31.9225937128)):
            Circle(F4_R)
        with Locations((34.4810523093, -31.9225937128)):
            Circle(F4_R)
    extrude(amount=F5_DEPTH)


solid = f1.part
